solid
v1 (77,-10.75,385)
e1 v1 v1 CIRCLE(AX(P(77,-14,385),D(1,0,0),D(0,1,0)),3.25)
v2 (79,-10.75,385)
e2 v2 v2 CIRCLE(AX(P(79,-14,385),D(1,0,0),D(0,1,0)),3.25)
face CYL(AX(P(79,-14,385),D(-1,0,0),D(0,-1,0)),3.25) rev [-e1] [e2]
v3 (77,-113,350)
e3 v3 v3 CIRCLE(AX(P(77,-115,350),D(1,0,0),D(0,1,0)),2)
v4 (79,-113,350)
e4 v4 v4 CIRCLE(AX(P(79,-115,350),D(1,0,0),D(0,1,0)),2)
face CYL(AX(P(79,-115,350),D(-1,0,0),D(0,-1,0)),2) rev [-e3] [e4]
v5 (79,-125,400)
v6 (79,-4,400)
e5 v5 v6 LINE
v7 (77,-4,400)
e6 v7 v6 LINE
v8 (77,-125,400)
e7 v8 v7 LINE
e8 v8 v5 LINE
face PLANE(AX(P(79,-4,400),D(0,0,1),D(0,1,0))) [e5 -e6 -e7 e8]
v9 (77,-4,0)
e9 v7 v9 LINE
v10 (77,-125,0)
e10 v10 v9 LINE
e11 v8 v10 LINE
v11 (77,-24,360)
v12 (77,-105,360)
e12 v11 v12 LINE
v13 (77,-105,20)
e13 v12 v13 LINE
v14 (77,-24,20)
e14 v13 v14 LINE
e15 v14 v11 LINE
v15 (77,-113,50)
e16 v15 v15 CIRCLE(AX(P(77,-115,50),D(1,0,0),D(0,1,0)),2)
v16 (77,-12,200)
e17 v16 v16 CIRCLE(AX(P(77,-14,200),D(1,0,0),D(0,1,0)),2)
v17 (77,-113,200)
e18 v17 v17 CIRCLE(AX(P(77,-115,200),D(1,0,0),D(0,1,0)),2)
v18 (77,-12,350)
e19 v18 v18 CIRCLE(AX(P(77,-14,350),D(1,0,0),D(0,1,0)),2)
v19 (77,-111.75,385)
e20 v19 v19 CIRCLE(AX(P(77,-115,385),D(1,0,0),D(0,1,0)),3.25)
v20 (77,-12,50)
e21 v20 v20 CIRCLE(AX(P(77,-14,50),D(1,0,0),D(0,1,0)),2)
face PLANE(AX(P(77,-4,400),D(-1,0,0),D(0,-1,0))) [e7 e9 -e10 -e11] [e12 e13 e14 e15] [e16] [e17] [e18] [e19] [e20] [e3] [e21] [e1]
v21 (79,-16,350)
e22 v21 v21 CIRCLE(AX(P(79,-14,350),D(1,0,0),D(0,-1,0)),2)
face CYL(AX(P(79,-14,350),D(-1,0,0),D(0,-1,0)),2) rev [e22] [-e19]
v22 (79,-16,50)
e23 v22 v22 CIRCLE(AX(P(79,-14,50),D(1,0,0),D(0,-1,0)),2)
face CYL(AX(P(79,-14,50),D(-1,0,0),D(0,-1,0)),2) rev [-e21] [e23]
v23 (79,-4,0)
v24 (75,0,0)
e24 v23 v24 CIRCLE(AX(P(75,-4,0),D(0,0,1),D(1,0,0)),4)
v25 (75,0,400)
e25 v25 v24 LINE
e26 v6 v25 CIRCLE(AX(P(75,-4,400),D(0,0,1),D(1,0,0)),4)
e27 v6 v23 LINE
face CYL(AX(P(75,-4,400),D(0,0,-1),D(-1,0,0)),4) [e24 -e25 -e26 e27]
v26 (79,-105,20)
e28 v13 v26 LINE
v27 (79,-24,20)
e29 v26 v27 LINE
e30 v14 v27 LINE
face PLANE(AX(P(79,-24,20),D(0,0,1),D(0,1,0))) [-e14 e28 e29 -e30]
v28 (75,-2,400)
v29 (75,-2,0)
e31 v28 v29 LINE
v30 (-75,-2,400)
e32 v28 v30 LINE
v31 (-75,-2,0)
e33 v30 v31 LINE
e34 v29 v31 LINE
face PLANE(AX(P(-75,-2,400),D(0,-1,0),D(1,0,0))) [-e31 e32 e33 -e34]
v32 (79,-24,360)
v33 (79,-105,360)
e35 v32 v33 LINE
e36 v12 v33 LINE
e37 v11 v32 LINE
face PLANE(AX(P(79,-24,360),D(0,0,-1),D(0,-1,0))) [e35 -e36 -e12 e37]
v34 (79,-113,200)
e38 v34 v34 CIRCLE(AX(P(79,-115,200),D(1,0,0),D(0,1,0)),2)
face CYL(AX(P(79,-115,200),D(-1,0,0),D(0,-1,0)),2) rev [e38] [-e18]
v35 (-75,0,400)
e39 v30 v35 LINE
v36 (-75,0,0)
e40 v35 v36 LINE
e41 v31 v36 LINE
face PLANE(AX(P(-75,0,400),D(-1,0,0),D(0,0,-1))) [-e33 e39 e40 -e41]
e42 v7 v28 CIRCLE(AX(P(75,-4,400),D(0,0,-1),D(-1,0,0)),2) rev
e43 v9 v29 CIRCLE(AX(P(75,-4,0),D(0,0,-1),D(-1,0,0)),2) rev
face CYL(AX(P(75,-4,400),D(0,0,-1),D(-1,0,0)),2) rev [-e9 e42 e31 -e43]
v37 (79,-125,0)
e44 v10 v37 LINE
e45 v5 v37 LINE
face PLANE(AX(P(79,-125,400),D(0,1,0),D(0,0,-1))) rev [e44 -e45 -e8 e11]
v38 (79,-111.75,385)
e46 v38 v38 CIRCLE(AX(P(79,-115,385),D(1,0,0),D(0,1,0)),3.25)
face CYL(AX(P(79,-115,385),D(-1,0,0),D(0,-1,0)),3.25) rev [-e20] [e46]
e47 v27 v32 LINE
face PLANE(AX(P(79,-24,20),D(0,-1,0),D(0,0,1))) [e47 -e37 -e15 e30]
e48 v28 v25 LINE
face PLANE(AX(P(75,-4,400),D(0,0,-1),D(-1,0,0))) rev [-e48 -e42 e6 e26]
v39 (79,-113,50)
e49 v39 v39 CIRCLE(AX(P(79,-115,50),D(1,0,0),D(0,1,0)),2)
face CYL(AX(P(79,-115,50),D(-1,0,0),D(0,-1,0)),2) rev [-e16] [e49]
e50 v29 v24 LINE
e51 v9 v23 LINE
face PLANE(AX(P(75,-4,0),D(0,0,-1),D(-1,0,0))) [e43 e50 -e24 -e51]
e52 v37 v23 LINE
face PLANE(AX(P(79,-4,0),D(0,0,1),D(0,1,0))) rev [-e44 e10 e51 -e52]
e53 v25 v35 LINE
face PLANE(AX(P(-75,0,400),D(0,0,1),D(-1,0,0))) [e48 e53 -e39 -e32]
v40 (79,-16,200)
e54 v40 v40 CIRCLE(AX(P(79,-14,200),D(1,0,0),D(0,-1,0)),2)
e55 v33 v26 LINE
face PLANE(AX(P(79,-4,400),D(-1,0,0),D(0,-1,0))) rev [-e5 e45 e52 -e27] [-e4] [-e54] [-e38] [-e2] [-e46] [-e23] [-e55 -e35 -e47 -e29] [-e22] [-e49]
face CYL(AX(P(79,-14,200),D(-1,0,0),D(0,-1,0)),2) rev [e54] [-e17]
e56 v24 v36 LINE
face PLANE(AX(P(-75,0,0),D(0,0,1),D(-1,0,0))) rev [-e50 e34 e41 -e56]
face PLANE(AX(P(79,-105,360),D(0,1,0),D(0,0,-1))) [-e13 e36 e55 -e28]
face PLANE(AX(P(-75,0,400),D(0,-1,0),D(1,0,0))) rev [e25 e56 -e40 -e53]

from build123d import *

# Parameters (mm, degrees)
BOSS_EXTRUDE1_DEPTH  = 400
CUT_EXTRUDE1_REACH   = 448.476
SKETCH2_W            = 340
SKETCH2_H            = 81
CUT_EXTRUDE2_REACH   = 448.476
SKETCH4_R            = 3.25
SKETCH5_R            = 2
CUT_EXTRUDE3_DEPTH   = 10
CONVERT_SOLID1_DEPTH = 400


# Read off the part's stored shape, not the designer's step: Convert-Solid1
with BuildPart() as part:
    # Sketch1 → Boss-Extrude1 (new body)
    with BuildSketch(Plane.XY):
        with BuildLine():
            Line((-75, 0), (75, 0))
            ThreePointArc((75, 0), (77.828427125, -1.171572875), (79, -4))
            Line((79, -4), (79, -125))
            Line((79, -125), (77, -125))
            Line((77, -125), (77, -6))
            ThreePointArc((77, -6), (75.828427125, -3.171572875), (73, -2))
            Line((73, -2), (-75, -2))
            Line((-75, -2), (-75, 0))
        make_face()
    extrude(amount=BOSS_EXTRUDE1_DEPTH)

    # Sketch2 → Cut-Extrude1 (cut, up to next)
    with BuildSketch(Plane(origin=(79, 0, 0), x_dir=(0, 0, -1), z_dir=(1, 0, 0)), mode=Mode.PRIVATE) as cut_extrude1_sk1:
        with Locations((-190, -64.5)):
            Rectangle(SKETCH2_W, SKETCH2_H)
    cut_extrude1_tool1 = extrude(cut_extrude1_sk1.sketch, amount=-CUT_EXTRUDE1_REACH, mode=Mode.PRIVATE) & part.part
    add(cut_extrude1_tool1.solids().sort_by_distance((79, -64.5, 190))[0], mode=Mode.SUBTRACT)

    # Sketch4 → Cut-Extrude2 (cut, up to next)
    with BuildSketch(Plane(origin=(79, 0, 0), x_dir=(0, 0, -1), z_dir=(1, 0, 0)), mode=Mode.PRIVATE) as cut_extrude2_sk1:
        with Locations(Location((-385, -14, 0), (0, 0, 90))):
            Circle(SKETCH4_R)
    cut_extrude2_tool1 = extrude(cut_extrude2_sk1.sketch, amount=-CUT_EXTRUDE2_REACH, mode=Mode.PRIVATE) & part.part
    # Sketch4 → Cut-Extrude2 (cut, up to next)
    with BuildSketch(Plane(origin=(79, 0, 0), x_dir=(0, 0, -1), z_dir=(1, 0, 0)), mode=Mode.PRIVATE) as cut_extrude2_sk2:
        with Locations(Location((-385, -115, 0), (0, 0, 90))):
            Circle(SKETCH4_R)
    cut_extrude2_tool2 = extrude(cut_extrude2_sk2.sketch, amount=-CUT_EXTRUDE2_REACH, mode=Mode.PRIVATE) & part.part
    add(cut_extrude2_tool1.solids().sort_by_distance((79, -14, 385))[0], mode=Mode.SUBTRACT)
    add(cut_extrude2_tool2.solids().sort_by_distance((79, -115, 385))[0], mode=Mode.SUBTRACT)

    # Sketch5 → Cut-Extrude3 (cut)
    with BuildSketch(Plane(origin=(79, 0, 0), x_dir=(0, 0, -1), z_dir=(1, 0, 0))):
        with Locations(Location((-50, -115, 0), (0, 0, 90))):
            Circle(SKETCH5_R)
        with Locations(Location((-200, -115, 0), (0, 0, 90))):
            Circle(SKETCH5_R)
        with Locations(Location((-350, -115, 0), (0, 0, 90))):
            Circle(SKETCH5_R)
        with Locations(Location((-350, -14, 0), (0, 0, 90))):
            Circle(SKETCH5_R)
        with Locations(Location((-200, -14, 0), (0, 0, 90))):
            Circle(SKETCH5_R)
        with Locations(Location((-50, -14, 0), (0, 0, 90))):
            Circle(SKETCH5_R)
    extrude(amount=-CUT_EXTRUDE3_DEPTH, mode=Mode.SUBTRACT)

    # Convert-Solid1 outline → Convert-Solid1 (cut)
    with BuildSketch(Plane.XY):
        with BuildLine():
            ThreePointArc((77, -4), (76.414213562, -2.585786438), (75, -2))
            Line((75, -2), (73, -2))
            ThreePointArc((73, -2), (75.828427125, -3.171572875), (77, -6))
            Line((77, -6), (77, -4))
        make_face()
    extrude(amount=CONVERT_SOLID1_DEPTH, mode=Mode.SUBTRACT)


solid = part.part
